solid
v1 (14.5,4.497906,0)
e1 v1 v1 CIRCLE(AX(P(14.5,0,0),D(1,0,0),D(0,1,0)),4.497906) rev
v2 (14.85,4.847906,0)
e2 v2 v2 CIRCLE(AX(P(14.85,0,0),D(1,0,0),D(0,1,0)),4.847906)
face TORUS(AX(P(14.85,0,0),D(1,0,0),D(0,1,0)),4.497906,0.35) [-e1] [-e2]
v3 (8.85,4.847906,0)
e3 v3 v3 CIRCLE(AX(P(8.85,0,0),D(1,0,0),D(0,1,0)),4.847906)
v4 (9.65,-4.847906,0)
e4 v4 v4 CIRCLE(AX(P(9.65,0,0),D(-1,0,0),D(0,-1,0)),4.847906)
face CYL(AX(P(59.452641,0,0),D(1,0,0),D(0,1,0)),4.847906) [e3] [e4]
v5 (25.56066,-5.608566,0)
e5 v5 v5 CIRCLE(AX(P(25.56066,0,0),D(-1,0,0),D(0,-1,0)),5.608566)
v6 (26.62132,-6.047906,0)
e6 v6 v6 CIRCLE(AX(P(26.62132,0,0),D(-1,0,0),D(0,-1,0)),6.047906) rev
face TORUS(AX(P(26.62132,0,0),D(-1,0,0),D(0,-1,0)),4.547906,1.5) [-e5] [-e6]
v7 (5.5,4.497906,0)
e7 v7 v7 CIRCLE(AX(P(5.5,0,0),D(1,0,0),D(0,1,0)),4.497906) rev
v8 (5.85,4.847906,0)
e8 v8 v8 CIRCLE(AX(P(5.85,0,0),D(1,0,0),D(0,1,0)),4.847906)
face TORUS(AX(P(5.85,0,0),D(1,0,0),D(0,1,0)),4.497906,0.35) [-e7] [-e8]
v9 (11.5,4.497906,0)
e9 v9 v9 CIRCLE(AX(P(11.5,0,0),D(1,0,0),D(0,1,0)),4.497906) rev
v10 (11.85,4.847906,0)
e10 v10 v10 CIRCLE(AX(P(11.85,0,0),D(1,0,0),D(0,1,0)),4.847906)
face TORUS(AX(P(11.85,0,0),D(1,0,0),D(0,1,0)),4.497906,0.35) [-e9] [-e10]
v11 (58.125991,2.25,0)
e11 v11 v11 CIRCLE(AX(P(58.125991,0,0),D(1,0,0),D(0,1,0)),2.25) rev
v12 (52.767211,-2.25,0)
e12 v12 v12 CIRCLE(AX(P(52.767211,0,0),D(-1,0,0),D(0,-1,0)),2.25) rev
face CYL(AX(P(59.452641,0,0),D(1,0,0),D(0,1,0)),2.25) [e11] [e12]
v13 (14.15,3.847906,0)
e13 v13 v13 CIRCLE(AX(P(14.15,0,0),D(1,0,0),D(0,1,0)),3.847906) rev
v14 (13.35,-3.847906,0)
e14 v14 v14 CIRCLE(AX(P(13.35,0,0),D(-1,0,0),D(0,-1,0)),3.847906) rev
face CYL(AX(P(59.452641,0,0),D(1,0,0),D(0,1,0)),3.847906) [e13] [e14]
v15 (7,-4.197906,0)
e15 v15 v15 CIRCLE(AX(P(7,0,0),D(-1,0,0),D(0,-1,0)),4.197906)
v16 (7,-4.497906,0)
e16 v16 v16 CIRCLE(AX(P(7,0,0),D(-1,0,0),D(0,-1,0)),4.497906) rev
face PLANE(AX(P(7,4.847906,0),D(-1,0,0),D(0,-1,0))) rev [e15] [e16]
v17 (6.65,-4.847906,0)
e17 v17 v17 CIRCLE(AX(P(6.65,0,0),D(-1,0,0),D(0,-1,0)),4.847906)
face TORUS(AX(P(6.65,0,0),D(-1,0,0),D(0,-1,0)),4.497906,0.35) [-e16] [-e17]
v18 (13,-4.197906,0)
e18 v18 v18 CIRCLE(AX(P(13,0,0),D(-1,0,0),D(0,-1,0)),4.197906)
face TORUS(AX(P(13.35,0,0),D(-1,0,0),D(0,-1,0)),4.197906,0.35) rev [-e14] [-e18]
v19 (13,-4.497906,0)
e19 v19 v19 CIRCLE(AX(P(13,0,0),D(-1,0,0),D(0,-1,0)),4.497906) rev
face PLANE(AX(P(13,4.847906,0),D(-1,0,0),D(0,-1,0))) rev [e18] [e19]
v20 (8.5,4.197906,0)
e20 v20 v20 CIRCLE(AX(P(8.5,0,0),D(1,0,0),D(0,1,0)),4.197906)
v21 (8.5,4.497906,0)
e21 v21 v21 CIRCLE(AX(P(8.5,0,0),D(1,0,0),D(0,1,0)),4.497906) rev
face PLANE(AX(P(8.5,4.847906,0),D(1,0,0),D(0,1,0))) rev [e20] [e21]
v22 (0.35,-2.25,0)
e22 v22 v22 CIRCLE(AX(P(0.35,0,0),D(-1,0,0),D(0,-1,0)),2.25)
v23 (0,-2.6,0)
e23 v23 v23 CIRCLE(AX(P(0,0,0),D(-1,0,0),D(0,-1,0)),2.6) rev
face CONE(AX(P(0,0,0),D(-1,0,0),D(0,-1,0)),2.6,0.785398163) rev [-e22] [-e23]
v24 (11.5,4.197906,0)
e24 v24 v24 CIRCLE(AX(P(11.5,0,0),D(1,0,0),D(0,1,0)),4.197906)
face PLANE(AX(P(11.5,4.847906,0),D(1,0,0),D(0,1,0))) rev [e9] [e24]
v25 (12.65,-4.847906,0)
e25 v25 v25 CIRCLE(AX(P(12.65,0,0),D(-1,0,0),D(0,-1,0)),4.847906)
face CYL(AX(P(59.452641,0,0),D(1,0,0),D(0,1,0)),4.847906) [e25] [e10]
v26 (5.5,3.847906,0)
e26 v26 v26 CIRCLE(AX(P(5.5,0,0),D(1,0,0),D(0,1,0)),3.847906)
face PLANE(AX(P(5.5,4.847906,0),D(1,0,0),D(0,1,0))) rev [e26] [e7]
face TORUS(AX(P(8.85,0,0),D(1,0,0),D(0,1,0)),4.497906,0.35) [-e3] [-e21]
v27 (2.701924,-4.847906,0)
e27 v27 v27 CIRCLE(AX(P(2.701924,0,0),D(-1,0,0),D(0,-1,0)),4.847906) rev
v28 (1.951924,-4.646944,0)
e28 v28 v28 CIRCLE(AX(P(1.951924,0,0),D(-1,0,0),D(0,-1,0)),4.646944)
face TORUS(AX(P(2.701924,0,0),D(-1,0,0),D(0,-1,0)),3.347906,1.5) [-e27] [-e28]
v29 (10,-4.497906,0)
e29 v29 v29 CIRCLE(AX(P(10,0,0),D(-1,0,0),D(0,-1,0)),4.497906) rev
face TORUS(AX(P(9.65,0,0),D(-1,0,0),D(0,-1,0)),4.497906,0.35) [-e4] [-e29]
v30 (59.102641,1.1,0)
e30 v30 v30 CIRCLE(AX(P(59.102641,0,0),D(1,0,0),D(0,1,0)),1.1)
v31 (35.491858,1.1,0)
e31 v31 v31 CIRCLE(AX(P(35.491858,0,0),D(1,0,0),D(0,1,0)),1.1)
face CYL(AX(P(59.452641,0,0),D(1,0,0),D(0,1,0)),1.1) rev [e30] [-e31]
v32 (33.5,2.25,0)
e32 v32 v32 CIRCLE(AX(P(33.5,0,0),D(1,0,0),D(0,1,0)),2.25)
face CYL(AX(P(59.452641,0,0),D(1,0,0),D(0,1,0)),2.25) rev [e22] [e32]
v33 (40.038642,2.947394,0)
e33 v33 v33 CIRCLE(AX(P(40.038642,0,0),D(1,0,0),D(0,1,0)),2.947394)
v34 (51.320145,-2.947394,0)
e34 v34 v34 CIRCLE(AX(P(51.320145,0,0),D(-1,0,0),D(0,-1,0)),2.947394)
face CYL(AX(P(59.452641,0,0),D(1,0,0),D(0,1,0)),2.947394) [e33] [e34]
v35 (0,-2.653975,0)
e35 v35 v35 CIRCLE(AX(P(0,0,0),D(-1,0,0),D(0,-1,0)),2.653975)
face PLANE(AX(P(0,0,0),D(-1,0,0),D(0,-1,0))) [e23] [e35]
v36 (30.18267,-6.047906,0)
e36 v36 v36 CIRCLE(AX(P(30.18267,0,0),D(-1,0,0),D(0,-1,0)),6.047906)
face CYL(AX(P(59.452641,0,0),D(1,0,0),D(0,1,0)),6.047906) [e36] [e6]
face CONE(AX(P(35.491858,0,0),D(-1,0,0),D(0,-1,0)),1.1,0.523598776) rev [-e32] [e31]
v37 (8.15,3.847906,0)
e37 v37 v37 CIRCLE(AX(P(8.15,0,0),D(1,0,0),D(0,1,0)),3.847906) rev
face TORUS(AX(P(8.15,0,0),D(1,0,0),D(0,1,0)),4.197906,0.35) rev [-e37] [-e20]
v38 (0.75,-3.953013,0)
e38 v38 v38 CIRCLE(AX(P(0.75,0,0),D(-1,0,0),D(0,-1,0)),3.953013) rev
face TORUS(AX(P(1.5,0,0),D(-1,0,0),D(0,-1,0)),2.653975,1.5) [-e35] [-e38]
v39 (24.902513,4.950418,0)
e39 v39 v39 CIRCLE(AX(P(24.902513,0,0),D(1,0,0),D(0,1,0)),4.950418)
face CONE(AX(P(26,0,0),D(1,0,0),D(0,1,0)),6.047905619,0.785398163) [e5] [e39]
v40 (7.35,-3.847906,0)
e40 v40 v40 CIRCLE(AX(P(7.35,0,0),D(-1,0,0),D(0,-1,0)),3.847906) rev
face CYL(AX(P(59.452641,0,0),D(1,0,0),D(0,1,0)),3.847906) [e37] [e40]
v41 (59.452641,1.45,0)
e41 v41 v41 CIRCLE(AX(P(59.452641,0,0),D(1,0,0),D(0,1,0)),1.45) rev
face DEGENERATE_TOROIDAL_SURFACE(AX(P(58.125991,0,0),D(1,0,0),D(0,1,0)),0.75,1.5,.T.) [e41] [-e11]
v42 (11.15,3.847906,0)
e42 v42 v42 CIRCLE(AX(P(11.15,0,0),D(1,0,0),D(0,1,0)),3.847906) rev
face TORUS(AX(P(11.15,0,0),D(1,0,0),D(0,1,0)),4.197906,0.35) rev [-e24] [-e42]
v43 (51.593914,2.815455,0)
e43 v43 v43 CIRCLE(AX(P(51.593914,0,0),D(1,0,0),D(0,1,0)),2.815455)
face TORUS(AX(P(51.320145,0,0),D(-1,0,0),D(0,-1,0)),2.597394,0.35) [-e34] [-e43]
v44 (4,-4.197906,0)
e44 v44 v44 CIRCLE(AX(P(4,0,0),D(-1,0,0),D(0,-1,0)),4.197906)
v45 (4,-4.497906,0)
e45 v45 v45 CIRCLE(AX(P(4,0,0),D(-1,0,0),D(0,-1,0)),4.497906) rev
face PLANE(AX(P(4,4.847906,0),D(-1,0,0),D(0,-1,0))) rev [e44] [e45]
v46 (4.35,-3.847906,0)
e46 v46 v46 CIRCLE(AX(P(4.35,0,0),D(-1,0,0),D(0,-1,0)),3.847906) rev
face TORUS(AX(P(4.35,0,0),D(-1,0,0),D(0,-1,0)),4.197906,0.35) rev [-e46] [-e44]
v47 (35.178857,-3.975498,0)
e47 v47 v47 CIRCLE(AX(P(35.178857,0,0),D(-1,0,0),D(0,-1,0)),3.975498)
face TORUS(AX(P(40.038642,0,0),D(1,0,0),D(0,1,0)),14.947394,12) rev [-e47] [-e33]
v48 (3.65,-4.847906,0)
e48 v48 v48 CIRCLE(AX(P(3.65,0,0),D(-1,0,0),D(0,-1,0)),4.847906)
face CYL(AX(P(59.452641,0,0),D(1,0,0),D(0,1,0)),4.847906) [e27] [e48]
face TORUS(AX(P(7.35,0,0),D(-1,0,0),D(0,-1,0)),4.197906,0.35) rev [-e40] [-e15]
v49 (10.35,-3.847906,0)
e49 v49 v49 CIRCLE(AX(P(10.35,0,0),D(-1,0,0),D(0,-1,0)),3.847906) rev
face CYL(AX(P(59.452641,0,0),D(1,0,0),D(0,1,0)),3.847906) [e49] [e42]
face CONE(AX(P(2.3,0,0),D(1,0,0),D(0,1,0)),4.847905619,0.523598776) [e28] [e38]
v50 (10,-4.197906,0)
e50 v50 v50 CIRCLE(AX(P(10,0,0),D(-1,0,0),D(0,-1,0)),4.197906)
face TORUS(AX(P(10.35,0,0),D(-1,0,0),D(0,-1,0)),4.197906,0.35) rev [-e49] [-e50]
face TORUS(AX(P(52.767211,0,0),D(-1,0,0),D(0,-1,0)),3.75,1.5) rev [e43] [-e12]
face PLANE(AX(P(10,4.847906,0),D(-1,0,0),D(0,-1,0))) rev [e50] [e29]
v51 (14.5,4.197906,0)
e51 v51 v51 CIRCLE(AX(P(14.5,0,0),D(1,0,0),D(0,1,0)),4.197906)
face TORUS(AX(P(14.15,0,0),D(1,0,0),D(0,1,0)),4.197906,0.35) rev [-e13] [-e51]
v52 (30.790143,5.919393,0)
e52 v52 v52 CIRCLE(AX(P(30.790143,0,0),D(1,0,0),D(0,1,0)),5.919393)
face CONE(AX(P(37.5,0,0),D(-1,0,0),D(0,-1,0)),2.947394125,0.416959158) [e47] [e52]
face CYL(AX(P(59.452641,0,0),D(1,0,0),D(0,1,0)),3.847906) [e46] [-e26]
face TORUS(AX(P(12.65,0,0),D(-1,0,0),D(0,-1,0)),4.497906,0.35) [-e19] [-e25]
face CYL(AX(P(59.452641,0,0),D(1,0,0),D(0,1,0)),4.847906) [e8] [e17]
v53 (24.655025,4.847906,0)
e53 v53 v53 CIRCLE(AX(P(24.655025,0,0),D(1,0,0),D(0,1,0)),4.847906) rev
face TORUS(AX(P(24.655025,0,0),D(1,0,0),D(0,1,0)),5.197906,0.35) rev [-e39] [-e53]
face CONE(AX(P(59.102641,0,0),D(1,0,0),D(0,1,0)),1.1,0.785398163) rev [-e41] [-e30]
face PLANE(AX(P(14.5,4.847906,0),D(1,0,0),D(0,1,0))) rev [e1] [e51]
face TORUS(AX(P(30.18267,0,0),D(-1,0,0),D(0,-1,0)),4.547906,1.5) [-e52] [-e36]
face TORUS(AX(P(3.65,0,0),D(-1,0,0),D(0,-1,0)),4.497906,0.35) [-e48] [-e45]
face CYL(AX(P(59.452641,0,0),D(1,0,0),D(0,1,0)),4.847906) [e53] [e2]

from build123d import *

# Parameters (mm, degrees)
SKETCH3_W     = 1.4999999999999991
SKETCH3_H     = 0.9999999999999996
SKETCH3_W_2   = 1.5
FILLET1_R     = 12
CHAMFER1_SIZE = 0.35
FILLET2_R     = 1.5
FILLET3_R     = 0.35
FILLET4_R     = 0.35


with BuildPart() as part:
    # Sketch1 → Revolve1 (revolve)
    with BuildSketch(Plane.XY):
        Polygon((0, 0), (0, 3.52), (2.2999999999999994, 4.847905619136144), (24.8, 4.847905619136144), (26, 6.047905619136149), (30.5, 6.047905619136149), (37.50000000000001, 2.9473941251088305), (51.50000000000001, 2.9473941251088296), (51.90264068586284, 2.249999999999999), (59.45264068586284, 2.2499999999999987), (59.452640685862846, 7e-17), align=None)
    revolve(axis=Axis((59.452640685862846, 7e-17, 0), (-1, 0, 0)))

    # Sketch2 → Cut-Revolve1 (revolve, cut)
    with BuildSketch(Plane.XY):
        Polygon((0, 2.25), (33.5, 2.25), (35.49185842870421, 1.0999999999999972), (59.45264068586284, 1.0999999999999972), (59.45264068586284, 0), (0, 0), align=None)
    revolve(axis=Axis((59.452640685862846, 7e-17, 0), (-1, 0, 0)), mode=Mode.SUBTRACT)

    # Sketch3 → Cut-Revolve2 (revolve, cut)
    with BuildSketch(Plane.XY):
        Polygon((4, 4.847905619136144), (5.5, 4.847905619136144), (5.5, 3.847905619136144), (4.000000000000001, 3.847905619136144), align=None)
        with Locations((7.75, 4.347905619136144)):
            Rectangle(SKETCH3_W, SKETCH3_H)
        Polygon((10, 4.847905619136144), (10.000000000000002, 3.847905619136144), (11.5, 3.847905619136144), (11.5, 4.847905619136144), align=None)
        with Locations((13.750000000000002, 4.347905619136144)):
            Rectangle(SKETCH3_W_2, SKETCH3_H)
    revolve(axis=Axis((59.452640685862846, 7e-17, 0), (-1, 0, 0)), mode=Mode.SUBTRACT)

    # Fillet1
    fillet1_edges = [part.edges().sort_by_distance(p)[0] for p in [
        (37.50000000000001, -2.9473941251088305, -3.6e-16),
    ]]
    fillet(fillet1_edges, radius=FILLET1_R)

    # Chamfer1
    chamfer1_edges = [part.edges().sort_by_distance(p)[0] for p in [
        (0, -2.25, -2.8e-16),
        (59.45264068586284, -1.0999999999999972, -1.3e-16),
    ]]
    chamfer(chamfer1_edges, length=CHAMFER1_SIZE)

    # Fillet2
    # the kernel refuses this fillet: 1.5 mm, written as the material it adds along each edge
    with BuildSketch(Plane(origin=(51.90264068586284, 6e-17, 0), x_dir=(0, 1, 0), z_dir=(0, 0, 1))) as fillet2_piece_1:
        with BuildLine():
            CenterArc((3.749999999999999, -0.864570350070089), FILLET2_R, 122.34869832224933, 57.651301677750666)
            Line((2.947394125108832, 0.40264068586282775), (2.9313420076110086, 0.4279849065814858))
            ThreePointArc((2.9313420076110086, 0.4279849065814858), (2.583697062554416, 0.22730110504495116), (2.2349999999999994, 0.02598076211353373))
            Line((2.2349999999999994, 0.02598076211353373), (2.2199999999999993, 0))
            Line((2.2199999999999993, 0), (2.2199999999999993, -0.864570350070089))
            Line((2.2199999999999993, -0.864570350070089), (2.249999999999999, -0.864570350070089))
        make_face()
    fillet2_piece_1_solid = revolve(axis=Axis((51.90264068586284, 6e-17, 0), (-1, 0, 0)), mode=Mode.PRIVATE)
    add([fillet2_piece_1_solid])
    # the kernel refuses this fillet: 1.5 mm, written as the material it takes off along each edge
    with BuildSketch(Plane(origin=(30.5, 4e-17, 0), x_dir=(0, 1, 0), z_dir=(0, 0, 1))) as fillet2_2_piece_1:
        with BuildLine():
            CenterArc((6.047905619136149 - FILLET2_R, FILLET2_R * 0.211553464978), FILLET2_R, 336.11, 23.88999999999998)
            Line((6.047905619136149, FILLET2_R * 0.211553464978), (6.047905619136149 + FILLET2_R * 0.02, FILLET2_R * 0.211553464978))
            Line((6.047905619136149 + FILLET2_R * 0.02, FILLET2_R * 0.211553464978), (6.047905619136149 + FILLET2_R * 0.02, -FILLET2_R * 0.00423106929956))
            Line((6.047905619136149 + FILLET2_R * 0.02, -FILLET2_R * 0.00423106929956), (6.047905619136149 - FILLET2_R * 0.0673888551076, -FILLET2_R * 0.201528188479))
            Line((6.047905619136149 - FILLET2_R * 0.0673888551076, -FILLET2_R * 0.201528188479), (6.047905619136149 - FILLET2_R * 0.0856753481447, -FILLET2_R * 0.193428548215))
        make_face()
    fillet2_2_piece_1_solid = revolve(axis=Axis((30.5, 4e-17, 0), (-1, 0, 0)), mode=Mode.PRIVATE)
    with BuildSketch(Plane(origin=(26, 3e-17, 0), x_dir=(0, 1, 0), z_dir=(0, 0, 1))) as fillet2_2_piece_2:
        with BuildLine():
            CenterArc((6.047905619136149 - FILLET2_R, -FILLET2_R * 0.414213562373), FILLET2_R, 0, 45.00000000000012)
            Line((6.047905619136149 - FILLET2_R * 0.292893218813, FILLET2_R * 0.292893218813), (6.047905619136149 - FILLET2_R * 0.27875108319, FILLET2_R * 0.307035354437))
            Line((6.047905619136149 - FILLET2_R * 0.27875108319, FILLET2_R * 0.307035354437), (6.047905619136149 + FILLET2_R * 0.02, FILLET2_R * 0.00828427124746))
            Line((6.047905619136149 + FILLET2_R * 0.02, FILLET2_R * 0.00828427124746), (6.047905619136149 + FILLET2_R * 0.02, -FILLET2_R * 0.414213562373))
            Line((6.047905619136149 + FILLET2_R * 0.02, -FILLET2_R * 0.414213562373), (6.047905619136149, -FILLET2_R * 0.414213562373))
        make_face()
    fillet2_2_piece_2_solid = revolve(axis=Axis((26, 3e-17, 0), (-1, 0, 0)), mode=Mode.PRIVATE)
    with BuildSketch(Plane(origin=(2.299999999999997, 0, 0), x_dir=(0, 1, 0), z_dir=(0, 0, 1))) as fillet2_2_piece_3:
        with BuildLine():
            CenterArc((4.847905619136144 - FILLET2_R, -FILLET2_R * 0.267949192431), FILLET2_R, 1.696e-14, 30.000000000000057)
            Line((4.847905619136144, -FILLET2_R * 0.267949192431), (4.847905619136144 + FILLET2_R * 0.02, -FILLET2_R * 0.267949192431))
            Line((4.847905619136144 + FILLET2_R * 0.02, -FILLET2_R * 0.267949192431), (4.847905619136144 + FILLET2_R * 0.02, FILLET2_R * 0.00535898384862))
            Line((4.847905619136144 + FILLET2_R * 0.02, FILLET2_R * 0.00535898384862), (4.847905619136144 - FILLET2_R * 0.11665408814, FILLET2_R * 0.242050807569))
            Line((4.847905619136144 - FILLET2_R * 0.11665408814, FILLET2_R * 0.242050807569), (4.847905619136144 - FILLET2_R * 0.133974596216, FILLET2_R * 0.232050807569))
        make_face()
    fillet2_2_piece_3_solid = revolve(axis=Axis((2.299999999999997, 0, 0), (-1, 0, 0)), mode=Mode.PRIVATE)
    with BuildSketch(Plane(origin=(0, 0, 0), x_dir=(0, 1, 0), z_dir=(0, 0, 1))) as fillet2_2_piece_4:
        with BuildLine():
            CenterArc((3.52 - FILLET2_R * 0.57735026919, -FILLET2_R), FILLET2_R, 30.0000000000001, 59.999999999999886)
            Line((3.52 + FILLET2_R * 0.288675134595, -FILLET2_R * 0.5), (3.52 + FILLET2_R * 0.305995642671, -FILLET2_R * 0.49))
            Line((3.52 + FILLET2_R * 0.305995642671, -FILLET2_R * 0.49), (3.52 + FILLET2_R * 0.0115470053838, FILLET2_R * 0.02))
            Line((3.52 + FILLET2_R * 0.0115470053838, FILLET2_R * 0.02), (3.52 - FILLET2_R * 0.57735026919, FILLET2_R * 0.02))
            Line((3.52 - FILLET2_R * 0.57735026919, FILLET2_R * 0.02), (3.52 - FILLET2_R * 0.57735026919, 0))
        make_face()
    fillet2_2_piece_4_solid = revolve(axis=Axis((0, 0, 0), (-1, 0, 0)), mode=Mode.PRIVATE)
    with BuildSketch(Plane(origin=(59.45264068586284, 7e-17, 0), x_dir=(0, 1, 0), z_dir=(0, 0, 1))) as fillet2_2_piece_5:
        with BuildLine():
            CenterArc((0.749999999999999, 1.3266499161421734), FILLET2_R, 297.81813928465357, 62.18186071534643)
            Line((2.249999999999999, 1.3266499161421734), (2.279999999999999, 1.3266499161421734))
            Line((2.279999999999999, 1.3266499161421734), (2.2799999999999985, 0))
            Line((2.2799999999999985, 0), (2.2499999999999987, -0.03000000000000114))
            ThreePointArc((2.2499999999999987, -0.03000000000000114), (1.8499999999999952, -0.03000000000000114), (1.4639999999999918, -0.02653299832283551))
            Line((1.4639999999999918, -0.02653299832283551), (1.449999999999992, 7.11e-15))
        make_face()
    fillet2_2_piece_5_solid = revolve(axis=Axis((59.45264068586284, 7e-17, 0), (-1, 0, 0)), mode=Mode.PRIVATE)
    add([fillet2_2_piece_1_solid, fillet2_2_piece_2_solid, fillet2_2_piece_3_solid, fillet2_2_piece_4_solid, fillet2_2_piece_5_solid], mode=Mode.SUBTRACT)

    # Fillet3
    fillet3_edges = [part.edges().sort_by_distance(p)[0] for p in [
        (4, -3.847905619136144, -4.7e-16),
        (5.5, -4.847905619136144, -5.9e-16),
        (4, -4.847905619136144, -5.9e-16),
        (7, -4.847905619136144, -5.9e-16),
        (8.5, -4.847905619136144, -5.9e-16),
        (8.5, -3.847905619136144, -4.7e-16),
        (7, -3.847905619136144, -4.7e-16),
        (10, -4.847905619136144, -5.9e-16),
        (11.5, -4.847905619136144, -5.9e-16),
        (11.5, -3.847905619136144, -4.7e-16),
        (10, -3.847905619136144, -4.7e-16),
        (13, -4.847905619136144, -5.9e-16),
        (14.5, -4.847905619136144, -5.9e-16),
        (14.5, -3.847905619136144, -4.7e-16),
        (13, -3.847905619136144, -4.7e-16),
    ]]
    fillet(fillet3_edges, radius=FILLET3_R)

    # Fillet4
    fillet4_edges = [part.edges().sort_by_distance(p)[0] for p in [
        (51.50000000000001, -2.9473941251088296, -3.6e-16),
        (24.799999999999997, -4.847905619136144, -5.9e-16),
    ]]
    fillet(fillet4_edges, radius=FILLET4_R)


solid = part.part
